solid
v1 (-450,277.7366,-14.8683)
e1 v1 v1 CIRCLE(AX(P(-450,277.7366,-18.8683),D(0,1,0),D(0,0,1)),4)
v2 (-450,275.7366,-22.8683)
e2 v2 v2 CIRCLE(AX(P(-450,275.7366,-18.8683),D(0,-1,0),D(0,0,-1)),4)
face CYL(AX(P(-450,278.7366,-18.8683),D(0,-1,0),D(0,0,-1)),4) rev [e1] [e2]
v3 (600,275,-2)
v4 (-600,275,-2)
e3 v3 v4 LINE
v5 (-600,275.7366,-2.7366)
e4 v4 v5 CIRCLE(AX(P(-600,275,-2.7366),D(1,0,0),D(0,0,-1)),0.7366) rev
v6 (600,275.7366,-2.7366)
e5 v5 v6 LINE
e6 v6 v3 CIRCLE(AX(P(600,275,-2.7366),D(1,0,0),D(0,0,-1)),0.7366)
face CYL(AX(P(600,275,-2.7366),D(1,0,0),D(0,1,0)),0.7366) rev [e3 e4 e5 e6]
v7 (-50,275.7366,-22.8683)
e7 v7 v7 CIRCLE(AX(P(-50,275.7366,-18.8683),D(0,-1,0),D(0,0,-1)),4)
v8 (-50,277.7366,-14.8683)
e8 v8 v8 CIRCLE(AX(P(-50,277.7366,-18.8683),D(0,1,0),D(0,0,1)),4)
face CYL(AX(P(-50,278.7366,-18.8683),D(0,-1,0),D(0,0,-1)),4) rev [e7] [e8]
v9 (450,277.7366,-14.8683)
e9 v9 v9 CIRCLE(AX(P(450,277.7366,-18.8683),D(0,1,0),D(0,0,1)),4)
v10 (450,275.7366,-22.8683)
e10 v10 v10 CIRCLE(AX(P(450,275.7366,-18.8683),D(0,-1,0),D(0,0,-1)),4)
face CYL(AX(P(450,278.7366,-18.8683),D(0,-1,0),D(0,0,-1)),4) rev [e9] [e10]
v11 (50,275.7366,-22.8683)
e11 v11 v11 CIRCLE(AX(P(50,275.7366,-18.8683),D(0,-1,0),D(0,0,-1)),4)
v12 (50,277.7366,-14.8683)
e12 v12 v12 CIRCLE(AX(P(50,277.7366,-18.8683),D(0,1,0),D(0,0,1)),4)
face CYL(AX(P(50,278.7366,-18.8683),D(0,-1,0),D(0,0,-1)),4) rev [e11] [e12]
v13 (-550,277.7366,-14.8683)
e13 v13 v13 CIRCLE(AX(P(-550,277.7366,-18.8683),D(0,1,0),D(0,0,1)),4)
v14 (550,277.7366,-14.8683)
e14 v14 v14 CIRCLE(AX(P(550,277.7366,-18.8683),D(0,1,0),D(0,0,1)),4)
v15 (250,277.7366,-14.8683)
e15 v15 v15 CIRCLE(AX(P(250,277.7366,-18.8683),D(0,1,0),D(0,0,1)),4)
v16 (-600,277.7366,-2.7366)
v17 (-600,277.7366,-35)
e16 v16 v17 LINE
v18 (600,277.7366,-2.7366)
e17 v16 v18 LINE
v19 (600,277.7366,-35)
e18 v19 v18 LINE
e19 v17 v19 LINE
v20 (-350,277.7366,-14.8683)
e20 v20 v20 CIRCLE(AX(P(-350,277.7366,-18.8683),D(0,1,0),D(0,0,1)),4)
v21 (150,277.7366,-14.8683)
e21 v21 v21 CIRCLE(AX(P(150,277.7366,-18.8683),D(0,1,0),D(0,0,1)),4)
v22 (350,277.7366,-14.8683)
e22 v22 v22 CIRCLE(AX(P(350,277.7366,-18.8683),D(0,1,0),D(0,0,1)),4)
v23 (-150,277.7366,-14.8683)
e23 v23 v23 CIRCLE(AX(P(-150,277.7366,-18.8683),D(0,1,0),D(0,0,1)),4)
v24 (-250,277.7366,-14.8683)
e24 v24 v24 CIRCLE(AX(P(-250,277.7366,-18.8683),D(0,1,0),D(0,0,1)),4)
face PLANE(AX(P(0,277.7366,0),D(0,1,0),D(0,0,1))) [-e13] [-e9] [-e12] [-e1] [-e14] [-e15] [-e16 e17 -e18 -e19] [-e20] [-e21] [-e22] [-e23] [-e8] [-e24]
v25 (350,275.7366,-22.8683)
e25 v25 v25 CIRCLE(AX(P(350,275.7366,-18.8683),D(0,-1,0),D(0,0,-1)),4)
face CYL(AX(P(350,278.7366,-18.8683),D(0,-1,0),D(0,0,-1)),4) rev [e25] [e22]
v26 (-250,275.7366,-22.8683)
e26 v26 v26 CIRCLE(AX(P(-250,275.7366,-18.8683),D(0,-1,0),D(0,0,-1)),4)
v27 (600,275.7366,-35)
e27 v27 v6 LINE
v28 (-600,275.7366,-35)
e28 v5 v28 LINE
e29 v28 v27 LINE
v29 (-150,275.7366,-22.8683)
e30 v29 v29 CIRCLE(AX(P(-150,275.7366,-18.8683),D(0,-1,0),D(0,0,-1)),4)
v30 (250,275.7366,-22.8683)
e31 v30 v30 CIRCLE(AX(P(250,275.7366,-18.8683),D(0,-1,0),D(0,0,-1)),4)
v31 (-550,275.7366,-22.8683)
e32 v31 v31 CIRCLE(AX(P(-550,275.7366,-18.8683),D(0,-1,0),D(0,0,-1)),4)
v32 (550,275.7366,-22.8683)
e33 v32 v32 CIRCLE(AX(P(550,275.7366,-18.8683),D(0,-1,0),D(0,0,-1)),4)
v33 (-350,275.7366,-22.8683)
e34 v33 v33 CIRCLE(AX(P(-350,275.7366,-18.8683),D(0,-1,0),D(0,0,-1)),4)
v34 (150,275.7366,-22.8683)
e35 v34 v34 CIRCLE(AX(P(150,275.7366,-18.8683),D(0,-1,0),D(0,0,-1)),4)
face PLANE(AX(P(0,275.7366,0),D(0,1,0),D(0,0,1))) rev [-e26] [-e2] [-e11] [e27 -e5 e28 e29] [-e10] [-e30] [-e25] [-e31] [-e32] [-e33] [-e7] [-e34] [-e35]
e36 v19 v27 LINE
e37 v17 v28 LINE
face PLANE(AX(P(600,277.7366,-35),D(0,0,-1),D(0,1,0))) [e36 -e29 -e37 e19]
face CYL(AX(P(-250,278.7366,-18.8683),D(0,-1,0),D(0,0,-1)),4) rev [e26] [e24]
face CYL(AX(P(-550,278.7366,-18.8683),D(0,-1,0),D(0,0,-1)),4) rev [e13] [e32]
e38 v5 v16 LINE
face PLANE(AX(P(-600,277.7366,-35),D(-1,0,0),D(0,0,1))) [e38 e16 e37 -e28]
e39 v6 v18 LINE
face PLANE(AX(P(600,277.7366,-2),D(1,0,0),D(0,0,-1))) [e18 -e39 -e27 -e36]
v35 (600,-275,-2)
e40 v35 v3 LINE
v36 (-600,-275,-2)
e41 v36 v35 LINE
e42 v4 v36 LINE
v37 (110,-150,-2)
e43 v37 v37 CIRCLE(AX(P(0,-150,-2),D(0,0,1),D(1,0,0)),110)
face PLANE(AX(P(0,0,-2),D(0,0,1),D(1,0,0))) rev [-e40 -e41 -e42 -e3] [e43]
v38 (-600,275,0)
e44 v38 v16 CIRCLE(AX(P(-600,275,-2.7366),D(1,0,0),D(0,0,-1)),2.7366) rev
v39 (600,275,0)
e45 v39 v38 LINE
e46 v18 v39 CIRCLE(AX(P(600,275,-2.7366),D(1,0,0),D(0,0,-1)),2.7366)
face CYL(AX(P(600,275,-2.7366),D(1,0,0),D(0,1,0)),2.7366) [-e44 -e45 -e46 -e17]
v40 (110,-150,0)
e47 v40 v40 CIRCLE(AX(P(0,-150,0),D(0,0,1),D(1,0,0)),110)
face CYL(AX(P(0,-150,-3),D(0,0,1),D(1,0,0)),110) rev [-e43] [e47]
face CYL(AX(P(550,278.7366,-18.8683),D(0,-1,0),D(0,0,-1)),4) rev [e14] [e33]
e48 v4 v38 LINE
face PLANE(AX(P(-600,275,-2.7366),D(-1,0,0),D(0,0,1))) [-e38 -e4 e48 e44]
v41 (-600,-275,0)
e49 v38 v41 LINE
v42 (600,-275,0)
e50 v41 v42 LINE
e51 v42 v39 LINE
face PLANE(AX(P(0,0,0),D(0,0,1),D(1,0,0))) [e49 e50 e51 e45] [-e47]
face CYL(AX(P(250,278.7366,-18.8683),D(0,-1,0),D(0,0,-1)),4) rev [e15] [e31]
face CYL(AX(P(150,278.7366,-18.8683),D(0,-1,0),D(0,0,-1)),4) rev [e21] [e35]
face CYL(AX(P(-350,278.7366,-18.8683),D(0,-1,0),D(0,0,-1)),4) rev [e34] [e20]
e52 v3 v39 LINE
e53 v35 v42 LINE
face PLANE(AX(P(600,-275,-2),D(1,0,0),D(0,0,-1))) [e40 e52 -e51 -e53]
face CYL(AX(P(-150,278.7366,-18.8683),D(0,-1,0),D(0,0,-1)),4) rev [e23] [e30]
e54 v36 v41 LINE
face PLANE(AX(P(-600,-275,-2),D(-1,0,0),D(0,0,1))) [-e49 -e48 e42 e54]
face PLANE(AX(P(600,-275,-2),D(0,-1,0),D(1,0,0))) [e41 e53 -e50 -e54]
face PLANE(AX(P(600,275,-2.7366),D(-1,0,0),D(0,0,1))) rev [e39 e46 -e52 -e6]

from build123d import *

# Parameters (mm, degrees)
SKETCH1_W          = 1200
SKETCH1_H          = 550
BASE_FLANGE1_DEPTH = 2
EDGE_FLANGE1_DEPTH = 1200
SKETCH9_R          = 4
CUT_EXTRUDE1_DEPTH = 10
SKETCH10_R         = 110
CUT_EXTRUDE2_DEPTH = 10


# Sheet-metal steps are written as plain solids
with BuildPart() as part:
    # Base-Flange1: sheet metal written as solids
    # Sketch1 → Base-Flange1 (new body)
    with BuildSketch(Plane.XY):
        Rectangle(SKETCH1_W, SKETCH1_H)
    extrude(amount=-BASE_FLANGE1_DEPTH)

    # Edge-Flange1: sheet metal written as solids
    # Edge-Flange1 section (on a plane across the edge) → Edge-Flange1 (add)
    with BuildSketch(Plane(origin=(-600, 275.7366, -2), x_dir=(0, -1, 0), z_dir=(1, 0, 0))):
        with BuildLine():
            Line((-2, 0.7366), (-2, 33))
            Line((-2, 33), (0, 33))
            Line((0, 33), (0, 0.7366))
            ThreePointArc((0, 0.7366), (0.215745145, 0.215745145), (0.7366, 0))
            Line((0.7366, 0), (0.7366, -2))
            ThreePointArc((0.7366, -2), (-1.198468417, -1.198468417), (-2, 0.7366))
        make_face()
    extrude(amount=EDGE_FLANGE1_DEPTH)

    # Sketch9 → Cut-Extrude1 (cut)
    with BuildSketch(Plane.XZ.offset(-275.7366)):
        with Locations(Location((-550, -18.8683, 0), (0, 0, 270))):
            Circle(SKETCH9_R)
        with Locations(Location((-450, -18.8683, 0), (0, 0, 270))):
            Circle(SKETCH9_R)
        with Locations(Location((-350, -18.8683, 0), (0, 0, 270))):
            Circle(SKETCH9_R)
        with Locations(Location((-250, -18.8683, 0), (0, 0, 270))):
            Circle(SKETCH9_R)
        with Locations(Location((-150, -18.8683, 0), (0, 0, 270))):
            Circle(SKETCH9_R)
        with Locations(Location((-50, -18.8683, 0), (0, 0, 270))):
            Circle(SKETCH9_R)
        with Locations(Location((50, -18.8683, 0), (0, 0, 270))):
            Circle(SKETCH9_R)
        with Locations(Location((150, -18.8683, 0), (0, 0, 270))):
            Circle(SKETCH9_R)
        with Locations(Location((250, -18.8683, 0), (0, 0, 270))):
            Circle(SKETCH9_R)
        with Locations(Location((350, -18.8683, 0), (0, 0, 270))):
            Circle(SKETCH9_R)
        with Locations(Location((450, -18.8683, 0), (0, 0, 270))):
            Circle(SKETCH9_R)
        with Locations(Location((550, -18.8683, 0), (0, 0, 270))):
            Circle(SKETCH9_R)
    extrude(amount=-CUT_EXTRUDE1_DEPTH, mode=Mode.SUBTRACT)

    # Sketch10 → Cut-Extrude2 (cut)
    with BuildSketch(Plane.XY):
        with Locations((0, -150)):
            Circle(SKETCH10_R)
    extrude(amount=-CUT_EXTRUDE2_DEPTH, mode=Mode.SUBTRACT)


solid = part.part
